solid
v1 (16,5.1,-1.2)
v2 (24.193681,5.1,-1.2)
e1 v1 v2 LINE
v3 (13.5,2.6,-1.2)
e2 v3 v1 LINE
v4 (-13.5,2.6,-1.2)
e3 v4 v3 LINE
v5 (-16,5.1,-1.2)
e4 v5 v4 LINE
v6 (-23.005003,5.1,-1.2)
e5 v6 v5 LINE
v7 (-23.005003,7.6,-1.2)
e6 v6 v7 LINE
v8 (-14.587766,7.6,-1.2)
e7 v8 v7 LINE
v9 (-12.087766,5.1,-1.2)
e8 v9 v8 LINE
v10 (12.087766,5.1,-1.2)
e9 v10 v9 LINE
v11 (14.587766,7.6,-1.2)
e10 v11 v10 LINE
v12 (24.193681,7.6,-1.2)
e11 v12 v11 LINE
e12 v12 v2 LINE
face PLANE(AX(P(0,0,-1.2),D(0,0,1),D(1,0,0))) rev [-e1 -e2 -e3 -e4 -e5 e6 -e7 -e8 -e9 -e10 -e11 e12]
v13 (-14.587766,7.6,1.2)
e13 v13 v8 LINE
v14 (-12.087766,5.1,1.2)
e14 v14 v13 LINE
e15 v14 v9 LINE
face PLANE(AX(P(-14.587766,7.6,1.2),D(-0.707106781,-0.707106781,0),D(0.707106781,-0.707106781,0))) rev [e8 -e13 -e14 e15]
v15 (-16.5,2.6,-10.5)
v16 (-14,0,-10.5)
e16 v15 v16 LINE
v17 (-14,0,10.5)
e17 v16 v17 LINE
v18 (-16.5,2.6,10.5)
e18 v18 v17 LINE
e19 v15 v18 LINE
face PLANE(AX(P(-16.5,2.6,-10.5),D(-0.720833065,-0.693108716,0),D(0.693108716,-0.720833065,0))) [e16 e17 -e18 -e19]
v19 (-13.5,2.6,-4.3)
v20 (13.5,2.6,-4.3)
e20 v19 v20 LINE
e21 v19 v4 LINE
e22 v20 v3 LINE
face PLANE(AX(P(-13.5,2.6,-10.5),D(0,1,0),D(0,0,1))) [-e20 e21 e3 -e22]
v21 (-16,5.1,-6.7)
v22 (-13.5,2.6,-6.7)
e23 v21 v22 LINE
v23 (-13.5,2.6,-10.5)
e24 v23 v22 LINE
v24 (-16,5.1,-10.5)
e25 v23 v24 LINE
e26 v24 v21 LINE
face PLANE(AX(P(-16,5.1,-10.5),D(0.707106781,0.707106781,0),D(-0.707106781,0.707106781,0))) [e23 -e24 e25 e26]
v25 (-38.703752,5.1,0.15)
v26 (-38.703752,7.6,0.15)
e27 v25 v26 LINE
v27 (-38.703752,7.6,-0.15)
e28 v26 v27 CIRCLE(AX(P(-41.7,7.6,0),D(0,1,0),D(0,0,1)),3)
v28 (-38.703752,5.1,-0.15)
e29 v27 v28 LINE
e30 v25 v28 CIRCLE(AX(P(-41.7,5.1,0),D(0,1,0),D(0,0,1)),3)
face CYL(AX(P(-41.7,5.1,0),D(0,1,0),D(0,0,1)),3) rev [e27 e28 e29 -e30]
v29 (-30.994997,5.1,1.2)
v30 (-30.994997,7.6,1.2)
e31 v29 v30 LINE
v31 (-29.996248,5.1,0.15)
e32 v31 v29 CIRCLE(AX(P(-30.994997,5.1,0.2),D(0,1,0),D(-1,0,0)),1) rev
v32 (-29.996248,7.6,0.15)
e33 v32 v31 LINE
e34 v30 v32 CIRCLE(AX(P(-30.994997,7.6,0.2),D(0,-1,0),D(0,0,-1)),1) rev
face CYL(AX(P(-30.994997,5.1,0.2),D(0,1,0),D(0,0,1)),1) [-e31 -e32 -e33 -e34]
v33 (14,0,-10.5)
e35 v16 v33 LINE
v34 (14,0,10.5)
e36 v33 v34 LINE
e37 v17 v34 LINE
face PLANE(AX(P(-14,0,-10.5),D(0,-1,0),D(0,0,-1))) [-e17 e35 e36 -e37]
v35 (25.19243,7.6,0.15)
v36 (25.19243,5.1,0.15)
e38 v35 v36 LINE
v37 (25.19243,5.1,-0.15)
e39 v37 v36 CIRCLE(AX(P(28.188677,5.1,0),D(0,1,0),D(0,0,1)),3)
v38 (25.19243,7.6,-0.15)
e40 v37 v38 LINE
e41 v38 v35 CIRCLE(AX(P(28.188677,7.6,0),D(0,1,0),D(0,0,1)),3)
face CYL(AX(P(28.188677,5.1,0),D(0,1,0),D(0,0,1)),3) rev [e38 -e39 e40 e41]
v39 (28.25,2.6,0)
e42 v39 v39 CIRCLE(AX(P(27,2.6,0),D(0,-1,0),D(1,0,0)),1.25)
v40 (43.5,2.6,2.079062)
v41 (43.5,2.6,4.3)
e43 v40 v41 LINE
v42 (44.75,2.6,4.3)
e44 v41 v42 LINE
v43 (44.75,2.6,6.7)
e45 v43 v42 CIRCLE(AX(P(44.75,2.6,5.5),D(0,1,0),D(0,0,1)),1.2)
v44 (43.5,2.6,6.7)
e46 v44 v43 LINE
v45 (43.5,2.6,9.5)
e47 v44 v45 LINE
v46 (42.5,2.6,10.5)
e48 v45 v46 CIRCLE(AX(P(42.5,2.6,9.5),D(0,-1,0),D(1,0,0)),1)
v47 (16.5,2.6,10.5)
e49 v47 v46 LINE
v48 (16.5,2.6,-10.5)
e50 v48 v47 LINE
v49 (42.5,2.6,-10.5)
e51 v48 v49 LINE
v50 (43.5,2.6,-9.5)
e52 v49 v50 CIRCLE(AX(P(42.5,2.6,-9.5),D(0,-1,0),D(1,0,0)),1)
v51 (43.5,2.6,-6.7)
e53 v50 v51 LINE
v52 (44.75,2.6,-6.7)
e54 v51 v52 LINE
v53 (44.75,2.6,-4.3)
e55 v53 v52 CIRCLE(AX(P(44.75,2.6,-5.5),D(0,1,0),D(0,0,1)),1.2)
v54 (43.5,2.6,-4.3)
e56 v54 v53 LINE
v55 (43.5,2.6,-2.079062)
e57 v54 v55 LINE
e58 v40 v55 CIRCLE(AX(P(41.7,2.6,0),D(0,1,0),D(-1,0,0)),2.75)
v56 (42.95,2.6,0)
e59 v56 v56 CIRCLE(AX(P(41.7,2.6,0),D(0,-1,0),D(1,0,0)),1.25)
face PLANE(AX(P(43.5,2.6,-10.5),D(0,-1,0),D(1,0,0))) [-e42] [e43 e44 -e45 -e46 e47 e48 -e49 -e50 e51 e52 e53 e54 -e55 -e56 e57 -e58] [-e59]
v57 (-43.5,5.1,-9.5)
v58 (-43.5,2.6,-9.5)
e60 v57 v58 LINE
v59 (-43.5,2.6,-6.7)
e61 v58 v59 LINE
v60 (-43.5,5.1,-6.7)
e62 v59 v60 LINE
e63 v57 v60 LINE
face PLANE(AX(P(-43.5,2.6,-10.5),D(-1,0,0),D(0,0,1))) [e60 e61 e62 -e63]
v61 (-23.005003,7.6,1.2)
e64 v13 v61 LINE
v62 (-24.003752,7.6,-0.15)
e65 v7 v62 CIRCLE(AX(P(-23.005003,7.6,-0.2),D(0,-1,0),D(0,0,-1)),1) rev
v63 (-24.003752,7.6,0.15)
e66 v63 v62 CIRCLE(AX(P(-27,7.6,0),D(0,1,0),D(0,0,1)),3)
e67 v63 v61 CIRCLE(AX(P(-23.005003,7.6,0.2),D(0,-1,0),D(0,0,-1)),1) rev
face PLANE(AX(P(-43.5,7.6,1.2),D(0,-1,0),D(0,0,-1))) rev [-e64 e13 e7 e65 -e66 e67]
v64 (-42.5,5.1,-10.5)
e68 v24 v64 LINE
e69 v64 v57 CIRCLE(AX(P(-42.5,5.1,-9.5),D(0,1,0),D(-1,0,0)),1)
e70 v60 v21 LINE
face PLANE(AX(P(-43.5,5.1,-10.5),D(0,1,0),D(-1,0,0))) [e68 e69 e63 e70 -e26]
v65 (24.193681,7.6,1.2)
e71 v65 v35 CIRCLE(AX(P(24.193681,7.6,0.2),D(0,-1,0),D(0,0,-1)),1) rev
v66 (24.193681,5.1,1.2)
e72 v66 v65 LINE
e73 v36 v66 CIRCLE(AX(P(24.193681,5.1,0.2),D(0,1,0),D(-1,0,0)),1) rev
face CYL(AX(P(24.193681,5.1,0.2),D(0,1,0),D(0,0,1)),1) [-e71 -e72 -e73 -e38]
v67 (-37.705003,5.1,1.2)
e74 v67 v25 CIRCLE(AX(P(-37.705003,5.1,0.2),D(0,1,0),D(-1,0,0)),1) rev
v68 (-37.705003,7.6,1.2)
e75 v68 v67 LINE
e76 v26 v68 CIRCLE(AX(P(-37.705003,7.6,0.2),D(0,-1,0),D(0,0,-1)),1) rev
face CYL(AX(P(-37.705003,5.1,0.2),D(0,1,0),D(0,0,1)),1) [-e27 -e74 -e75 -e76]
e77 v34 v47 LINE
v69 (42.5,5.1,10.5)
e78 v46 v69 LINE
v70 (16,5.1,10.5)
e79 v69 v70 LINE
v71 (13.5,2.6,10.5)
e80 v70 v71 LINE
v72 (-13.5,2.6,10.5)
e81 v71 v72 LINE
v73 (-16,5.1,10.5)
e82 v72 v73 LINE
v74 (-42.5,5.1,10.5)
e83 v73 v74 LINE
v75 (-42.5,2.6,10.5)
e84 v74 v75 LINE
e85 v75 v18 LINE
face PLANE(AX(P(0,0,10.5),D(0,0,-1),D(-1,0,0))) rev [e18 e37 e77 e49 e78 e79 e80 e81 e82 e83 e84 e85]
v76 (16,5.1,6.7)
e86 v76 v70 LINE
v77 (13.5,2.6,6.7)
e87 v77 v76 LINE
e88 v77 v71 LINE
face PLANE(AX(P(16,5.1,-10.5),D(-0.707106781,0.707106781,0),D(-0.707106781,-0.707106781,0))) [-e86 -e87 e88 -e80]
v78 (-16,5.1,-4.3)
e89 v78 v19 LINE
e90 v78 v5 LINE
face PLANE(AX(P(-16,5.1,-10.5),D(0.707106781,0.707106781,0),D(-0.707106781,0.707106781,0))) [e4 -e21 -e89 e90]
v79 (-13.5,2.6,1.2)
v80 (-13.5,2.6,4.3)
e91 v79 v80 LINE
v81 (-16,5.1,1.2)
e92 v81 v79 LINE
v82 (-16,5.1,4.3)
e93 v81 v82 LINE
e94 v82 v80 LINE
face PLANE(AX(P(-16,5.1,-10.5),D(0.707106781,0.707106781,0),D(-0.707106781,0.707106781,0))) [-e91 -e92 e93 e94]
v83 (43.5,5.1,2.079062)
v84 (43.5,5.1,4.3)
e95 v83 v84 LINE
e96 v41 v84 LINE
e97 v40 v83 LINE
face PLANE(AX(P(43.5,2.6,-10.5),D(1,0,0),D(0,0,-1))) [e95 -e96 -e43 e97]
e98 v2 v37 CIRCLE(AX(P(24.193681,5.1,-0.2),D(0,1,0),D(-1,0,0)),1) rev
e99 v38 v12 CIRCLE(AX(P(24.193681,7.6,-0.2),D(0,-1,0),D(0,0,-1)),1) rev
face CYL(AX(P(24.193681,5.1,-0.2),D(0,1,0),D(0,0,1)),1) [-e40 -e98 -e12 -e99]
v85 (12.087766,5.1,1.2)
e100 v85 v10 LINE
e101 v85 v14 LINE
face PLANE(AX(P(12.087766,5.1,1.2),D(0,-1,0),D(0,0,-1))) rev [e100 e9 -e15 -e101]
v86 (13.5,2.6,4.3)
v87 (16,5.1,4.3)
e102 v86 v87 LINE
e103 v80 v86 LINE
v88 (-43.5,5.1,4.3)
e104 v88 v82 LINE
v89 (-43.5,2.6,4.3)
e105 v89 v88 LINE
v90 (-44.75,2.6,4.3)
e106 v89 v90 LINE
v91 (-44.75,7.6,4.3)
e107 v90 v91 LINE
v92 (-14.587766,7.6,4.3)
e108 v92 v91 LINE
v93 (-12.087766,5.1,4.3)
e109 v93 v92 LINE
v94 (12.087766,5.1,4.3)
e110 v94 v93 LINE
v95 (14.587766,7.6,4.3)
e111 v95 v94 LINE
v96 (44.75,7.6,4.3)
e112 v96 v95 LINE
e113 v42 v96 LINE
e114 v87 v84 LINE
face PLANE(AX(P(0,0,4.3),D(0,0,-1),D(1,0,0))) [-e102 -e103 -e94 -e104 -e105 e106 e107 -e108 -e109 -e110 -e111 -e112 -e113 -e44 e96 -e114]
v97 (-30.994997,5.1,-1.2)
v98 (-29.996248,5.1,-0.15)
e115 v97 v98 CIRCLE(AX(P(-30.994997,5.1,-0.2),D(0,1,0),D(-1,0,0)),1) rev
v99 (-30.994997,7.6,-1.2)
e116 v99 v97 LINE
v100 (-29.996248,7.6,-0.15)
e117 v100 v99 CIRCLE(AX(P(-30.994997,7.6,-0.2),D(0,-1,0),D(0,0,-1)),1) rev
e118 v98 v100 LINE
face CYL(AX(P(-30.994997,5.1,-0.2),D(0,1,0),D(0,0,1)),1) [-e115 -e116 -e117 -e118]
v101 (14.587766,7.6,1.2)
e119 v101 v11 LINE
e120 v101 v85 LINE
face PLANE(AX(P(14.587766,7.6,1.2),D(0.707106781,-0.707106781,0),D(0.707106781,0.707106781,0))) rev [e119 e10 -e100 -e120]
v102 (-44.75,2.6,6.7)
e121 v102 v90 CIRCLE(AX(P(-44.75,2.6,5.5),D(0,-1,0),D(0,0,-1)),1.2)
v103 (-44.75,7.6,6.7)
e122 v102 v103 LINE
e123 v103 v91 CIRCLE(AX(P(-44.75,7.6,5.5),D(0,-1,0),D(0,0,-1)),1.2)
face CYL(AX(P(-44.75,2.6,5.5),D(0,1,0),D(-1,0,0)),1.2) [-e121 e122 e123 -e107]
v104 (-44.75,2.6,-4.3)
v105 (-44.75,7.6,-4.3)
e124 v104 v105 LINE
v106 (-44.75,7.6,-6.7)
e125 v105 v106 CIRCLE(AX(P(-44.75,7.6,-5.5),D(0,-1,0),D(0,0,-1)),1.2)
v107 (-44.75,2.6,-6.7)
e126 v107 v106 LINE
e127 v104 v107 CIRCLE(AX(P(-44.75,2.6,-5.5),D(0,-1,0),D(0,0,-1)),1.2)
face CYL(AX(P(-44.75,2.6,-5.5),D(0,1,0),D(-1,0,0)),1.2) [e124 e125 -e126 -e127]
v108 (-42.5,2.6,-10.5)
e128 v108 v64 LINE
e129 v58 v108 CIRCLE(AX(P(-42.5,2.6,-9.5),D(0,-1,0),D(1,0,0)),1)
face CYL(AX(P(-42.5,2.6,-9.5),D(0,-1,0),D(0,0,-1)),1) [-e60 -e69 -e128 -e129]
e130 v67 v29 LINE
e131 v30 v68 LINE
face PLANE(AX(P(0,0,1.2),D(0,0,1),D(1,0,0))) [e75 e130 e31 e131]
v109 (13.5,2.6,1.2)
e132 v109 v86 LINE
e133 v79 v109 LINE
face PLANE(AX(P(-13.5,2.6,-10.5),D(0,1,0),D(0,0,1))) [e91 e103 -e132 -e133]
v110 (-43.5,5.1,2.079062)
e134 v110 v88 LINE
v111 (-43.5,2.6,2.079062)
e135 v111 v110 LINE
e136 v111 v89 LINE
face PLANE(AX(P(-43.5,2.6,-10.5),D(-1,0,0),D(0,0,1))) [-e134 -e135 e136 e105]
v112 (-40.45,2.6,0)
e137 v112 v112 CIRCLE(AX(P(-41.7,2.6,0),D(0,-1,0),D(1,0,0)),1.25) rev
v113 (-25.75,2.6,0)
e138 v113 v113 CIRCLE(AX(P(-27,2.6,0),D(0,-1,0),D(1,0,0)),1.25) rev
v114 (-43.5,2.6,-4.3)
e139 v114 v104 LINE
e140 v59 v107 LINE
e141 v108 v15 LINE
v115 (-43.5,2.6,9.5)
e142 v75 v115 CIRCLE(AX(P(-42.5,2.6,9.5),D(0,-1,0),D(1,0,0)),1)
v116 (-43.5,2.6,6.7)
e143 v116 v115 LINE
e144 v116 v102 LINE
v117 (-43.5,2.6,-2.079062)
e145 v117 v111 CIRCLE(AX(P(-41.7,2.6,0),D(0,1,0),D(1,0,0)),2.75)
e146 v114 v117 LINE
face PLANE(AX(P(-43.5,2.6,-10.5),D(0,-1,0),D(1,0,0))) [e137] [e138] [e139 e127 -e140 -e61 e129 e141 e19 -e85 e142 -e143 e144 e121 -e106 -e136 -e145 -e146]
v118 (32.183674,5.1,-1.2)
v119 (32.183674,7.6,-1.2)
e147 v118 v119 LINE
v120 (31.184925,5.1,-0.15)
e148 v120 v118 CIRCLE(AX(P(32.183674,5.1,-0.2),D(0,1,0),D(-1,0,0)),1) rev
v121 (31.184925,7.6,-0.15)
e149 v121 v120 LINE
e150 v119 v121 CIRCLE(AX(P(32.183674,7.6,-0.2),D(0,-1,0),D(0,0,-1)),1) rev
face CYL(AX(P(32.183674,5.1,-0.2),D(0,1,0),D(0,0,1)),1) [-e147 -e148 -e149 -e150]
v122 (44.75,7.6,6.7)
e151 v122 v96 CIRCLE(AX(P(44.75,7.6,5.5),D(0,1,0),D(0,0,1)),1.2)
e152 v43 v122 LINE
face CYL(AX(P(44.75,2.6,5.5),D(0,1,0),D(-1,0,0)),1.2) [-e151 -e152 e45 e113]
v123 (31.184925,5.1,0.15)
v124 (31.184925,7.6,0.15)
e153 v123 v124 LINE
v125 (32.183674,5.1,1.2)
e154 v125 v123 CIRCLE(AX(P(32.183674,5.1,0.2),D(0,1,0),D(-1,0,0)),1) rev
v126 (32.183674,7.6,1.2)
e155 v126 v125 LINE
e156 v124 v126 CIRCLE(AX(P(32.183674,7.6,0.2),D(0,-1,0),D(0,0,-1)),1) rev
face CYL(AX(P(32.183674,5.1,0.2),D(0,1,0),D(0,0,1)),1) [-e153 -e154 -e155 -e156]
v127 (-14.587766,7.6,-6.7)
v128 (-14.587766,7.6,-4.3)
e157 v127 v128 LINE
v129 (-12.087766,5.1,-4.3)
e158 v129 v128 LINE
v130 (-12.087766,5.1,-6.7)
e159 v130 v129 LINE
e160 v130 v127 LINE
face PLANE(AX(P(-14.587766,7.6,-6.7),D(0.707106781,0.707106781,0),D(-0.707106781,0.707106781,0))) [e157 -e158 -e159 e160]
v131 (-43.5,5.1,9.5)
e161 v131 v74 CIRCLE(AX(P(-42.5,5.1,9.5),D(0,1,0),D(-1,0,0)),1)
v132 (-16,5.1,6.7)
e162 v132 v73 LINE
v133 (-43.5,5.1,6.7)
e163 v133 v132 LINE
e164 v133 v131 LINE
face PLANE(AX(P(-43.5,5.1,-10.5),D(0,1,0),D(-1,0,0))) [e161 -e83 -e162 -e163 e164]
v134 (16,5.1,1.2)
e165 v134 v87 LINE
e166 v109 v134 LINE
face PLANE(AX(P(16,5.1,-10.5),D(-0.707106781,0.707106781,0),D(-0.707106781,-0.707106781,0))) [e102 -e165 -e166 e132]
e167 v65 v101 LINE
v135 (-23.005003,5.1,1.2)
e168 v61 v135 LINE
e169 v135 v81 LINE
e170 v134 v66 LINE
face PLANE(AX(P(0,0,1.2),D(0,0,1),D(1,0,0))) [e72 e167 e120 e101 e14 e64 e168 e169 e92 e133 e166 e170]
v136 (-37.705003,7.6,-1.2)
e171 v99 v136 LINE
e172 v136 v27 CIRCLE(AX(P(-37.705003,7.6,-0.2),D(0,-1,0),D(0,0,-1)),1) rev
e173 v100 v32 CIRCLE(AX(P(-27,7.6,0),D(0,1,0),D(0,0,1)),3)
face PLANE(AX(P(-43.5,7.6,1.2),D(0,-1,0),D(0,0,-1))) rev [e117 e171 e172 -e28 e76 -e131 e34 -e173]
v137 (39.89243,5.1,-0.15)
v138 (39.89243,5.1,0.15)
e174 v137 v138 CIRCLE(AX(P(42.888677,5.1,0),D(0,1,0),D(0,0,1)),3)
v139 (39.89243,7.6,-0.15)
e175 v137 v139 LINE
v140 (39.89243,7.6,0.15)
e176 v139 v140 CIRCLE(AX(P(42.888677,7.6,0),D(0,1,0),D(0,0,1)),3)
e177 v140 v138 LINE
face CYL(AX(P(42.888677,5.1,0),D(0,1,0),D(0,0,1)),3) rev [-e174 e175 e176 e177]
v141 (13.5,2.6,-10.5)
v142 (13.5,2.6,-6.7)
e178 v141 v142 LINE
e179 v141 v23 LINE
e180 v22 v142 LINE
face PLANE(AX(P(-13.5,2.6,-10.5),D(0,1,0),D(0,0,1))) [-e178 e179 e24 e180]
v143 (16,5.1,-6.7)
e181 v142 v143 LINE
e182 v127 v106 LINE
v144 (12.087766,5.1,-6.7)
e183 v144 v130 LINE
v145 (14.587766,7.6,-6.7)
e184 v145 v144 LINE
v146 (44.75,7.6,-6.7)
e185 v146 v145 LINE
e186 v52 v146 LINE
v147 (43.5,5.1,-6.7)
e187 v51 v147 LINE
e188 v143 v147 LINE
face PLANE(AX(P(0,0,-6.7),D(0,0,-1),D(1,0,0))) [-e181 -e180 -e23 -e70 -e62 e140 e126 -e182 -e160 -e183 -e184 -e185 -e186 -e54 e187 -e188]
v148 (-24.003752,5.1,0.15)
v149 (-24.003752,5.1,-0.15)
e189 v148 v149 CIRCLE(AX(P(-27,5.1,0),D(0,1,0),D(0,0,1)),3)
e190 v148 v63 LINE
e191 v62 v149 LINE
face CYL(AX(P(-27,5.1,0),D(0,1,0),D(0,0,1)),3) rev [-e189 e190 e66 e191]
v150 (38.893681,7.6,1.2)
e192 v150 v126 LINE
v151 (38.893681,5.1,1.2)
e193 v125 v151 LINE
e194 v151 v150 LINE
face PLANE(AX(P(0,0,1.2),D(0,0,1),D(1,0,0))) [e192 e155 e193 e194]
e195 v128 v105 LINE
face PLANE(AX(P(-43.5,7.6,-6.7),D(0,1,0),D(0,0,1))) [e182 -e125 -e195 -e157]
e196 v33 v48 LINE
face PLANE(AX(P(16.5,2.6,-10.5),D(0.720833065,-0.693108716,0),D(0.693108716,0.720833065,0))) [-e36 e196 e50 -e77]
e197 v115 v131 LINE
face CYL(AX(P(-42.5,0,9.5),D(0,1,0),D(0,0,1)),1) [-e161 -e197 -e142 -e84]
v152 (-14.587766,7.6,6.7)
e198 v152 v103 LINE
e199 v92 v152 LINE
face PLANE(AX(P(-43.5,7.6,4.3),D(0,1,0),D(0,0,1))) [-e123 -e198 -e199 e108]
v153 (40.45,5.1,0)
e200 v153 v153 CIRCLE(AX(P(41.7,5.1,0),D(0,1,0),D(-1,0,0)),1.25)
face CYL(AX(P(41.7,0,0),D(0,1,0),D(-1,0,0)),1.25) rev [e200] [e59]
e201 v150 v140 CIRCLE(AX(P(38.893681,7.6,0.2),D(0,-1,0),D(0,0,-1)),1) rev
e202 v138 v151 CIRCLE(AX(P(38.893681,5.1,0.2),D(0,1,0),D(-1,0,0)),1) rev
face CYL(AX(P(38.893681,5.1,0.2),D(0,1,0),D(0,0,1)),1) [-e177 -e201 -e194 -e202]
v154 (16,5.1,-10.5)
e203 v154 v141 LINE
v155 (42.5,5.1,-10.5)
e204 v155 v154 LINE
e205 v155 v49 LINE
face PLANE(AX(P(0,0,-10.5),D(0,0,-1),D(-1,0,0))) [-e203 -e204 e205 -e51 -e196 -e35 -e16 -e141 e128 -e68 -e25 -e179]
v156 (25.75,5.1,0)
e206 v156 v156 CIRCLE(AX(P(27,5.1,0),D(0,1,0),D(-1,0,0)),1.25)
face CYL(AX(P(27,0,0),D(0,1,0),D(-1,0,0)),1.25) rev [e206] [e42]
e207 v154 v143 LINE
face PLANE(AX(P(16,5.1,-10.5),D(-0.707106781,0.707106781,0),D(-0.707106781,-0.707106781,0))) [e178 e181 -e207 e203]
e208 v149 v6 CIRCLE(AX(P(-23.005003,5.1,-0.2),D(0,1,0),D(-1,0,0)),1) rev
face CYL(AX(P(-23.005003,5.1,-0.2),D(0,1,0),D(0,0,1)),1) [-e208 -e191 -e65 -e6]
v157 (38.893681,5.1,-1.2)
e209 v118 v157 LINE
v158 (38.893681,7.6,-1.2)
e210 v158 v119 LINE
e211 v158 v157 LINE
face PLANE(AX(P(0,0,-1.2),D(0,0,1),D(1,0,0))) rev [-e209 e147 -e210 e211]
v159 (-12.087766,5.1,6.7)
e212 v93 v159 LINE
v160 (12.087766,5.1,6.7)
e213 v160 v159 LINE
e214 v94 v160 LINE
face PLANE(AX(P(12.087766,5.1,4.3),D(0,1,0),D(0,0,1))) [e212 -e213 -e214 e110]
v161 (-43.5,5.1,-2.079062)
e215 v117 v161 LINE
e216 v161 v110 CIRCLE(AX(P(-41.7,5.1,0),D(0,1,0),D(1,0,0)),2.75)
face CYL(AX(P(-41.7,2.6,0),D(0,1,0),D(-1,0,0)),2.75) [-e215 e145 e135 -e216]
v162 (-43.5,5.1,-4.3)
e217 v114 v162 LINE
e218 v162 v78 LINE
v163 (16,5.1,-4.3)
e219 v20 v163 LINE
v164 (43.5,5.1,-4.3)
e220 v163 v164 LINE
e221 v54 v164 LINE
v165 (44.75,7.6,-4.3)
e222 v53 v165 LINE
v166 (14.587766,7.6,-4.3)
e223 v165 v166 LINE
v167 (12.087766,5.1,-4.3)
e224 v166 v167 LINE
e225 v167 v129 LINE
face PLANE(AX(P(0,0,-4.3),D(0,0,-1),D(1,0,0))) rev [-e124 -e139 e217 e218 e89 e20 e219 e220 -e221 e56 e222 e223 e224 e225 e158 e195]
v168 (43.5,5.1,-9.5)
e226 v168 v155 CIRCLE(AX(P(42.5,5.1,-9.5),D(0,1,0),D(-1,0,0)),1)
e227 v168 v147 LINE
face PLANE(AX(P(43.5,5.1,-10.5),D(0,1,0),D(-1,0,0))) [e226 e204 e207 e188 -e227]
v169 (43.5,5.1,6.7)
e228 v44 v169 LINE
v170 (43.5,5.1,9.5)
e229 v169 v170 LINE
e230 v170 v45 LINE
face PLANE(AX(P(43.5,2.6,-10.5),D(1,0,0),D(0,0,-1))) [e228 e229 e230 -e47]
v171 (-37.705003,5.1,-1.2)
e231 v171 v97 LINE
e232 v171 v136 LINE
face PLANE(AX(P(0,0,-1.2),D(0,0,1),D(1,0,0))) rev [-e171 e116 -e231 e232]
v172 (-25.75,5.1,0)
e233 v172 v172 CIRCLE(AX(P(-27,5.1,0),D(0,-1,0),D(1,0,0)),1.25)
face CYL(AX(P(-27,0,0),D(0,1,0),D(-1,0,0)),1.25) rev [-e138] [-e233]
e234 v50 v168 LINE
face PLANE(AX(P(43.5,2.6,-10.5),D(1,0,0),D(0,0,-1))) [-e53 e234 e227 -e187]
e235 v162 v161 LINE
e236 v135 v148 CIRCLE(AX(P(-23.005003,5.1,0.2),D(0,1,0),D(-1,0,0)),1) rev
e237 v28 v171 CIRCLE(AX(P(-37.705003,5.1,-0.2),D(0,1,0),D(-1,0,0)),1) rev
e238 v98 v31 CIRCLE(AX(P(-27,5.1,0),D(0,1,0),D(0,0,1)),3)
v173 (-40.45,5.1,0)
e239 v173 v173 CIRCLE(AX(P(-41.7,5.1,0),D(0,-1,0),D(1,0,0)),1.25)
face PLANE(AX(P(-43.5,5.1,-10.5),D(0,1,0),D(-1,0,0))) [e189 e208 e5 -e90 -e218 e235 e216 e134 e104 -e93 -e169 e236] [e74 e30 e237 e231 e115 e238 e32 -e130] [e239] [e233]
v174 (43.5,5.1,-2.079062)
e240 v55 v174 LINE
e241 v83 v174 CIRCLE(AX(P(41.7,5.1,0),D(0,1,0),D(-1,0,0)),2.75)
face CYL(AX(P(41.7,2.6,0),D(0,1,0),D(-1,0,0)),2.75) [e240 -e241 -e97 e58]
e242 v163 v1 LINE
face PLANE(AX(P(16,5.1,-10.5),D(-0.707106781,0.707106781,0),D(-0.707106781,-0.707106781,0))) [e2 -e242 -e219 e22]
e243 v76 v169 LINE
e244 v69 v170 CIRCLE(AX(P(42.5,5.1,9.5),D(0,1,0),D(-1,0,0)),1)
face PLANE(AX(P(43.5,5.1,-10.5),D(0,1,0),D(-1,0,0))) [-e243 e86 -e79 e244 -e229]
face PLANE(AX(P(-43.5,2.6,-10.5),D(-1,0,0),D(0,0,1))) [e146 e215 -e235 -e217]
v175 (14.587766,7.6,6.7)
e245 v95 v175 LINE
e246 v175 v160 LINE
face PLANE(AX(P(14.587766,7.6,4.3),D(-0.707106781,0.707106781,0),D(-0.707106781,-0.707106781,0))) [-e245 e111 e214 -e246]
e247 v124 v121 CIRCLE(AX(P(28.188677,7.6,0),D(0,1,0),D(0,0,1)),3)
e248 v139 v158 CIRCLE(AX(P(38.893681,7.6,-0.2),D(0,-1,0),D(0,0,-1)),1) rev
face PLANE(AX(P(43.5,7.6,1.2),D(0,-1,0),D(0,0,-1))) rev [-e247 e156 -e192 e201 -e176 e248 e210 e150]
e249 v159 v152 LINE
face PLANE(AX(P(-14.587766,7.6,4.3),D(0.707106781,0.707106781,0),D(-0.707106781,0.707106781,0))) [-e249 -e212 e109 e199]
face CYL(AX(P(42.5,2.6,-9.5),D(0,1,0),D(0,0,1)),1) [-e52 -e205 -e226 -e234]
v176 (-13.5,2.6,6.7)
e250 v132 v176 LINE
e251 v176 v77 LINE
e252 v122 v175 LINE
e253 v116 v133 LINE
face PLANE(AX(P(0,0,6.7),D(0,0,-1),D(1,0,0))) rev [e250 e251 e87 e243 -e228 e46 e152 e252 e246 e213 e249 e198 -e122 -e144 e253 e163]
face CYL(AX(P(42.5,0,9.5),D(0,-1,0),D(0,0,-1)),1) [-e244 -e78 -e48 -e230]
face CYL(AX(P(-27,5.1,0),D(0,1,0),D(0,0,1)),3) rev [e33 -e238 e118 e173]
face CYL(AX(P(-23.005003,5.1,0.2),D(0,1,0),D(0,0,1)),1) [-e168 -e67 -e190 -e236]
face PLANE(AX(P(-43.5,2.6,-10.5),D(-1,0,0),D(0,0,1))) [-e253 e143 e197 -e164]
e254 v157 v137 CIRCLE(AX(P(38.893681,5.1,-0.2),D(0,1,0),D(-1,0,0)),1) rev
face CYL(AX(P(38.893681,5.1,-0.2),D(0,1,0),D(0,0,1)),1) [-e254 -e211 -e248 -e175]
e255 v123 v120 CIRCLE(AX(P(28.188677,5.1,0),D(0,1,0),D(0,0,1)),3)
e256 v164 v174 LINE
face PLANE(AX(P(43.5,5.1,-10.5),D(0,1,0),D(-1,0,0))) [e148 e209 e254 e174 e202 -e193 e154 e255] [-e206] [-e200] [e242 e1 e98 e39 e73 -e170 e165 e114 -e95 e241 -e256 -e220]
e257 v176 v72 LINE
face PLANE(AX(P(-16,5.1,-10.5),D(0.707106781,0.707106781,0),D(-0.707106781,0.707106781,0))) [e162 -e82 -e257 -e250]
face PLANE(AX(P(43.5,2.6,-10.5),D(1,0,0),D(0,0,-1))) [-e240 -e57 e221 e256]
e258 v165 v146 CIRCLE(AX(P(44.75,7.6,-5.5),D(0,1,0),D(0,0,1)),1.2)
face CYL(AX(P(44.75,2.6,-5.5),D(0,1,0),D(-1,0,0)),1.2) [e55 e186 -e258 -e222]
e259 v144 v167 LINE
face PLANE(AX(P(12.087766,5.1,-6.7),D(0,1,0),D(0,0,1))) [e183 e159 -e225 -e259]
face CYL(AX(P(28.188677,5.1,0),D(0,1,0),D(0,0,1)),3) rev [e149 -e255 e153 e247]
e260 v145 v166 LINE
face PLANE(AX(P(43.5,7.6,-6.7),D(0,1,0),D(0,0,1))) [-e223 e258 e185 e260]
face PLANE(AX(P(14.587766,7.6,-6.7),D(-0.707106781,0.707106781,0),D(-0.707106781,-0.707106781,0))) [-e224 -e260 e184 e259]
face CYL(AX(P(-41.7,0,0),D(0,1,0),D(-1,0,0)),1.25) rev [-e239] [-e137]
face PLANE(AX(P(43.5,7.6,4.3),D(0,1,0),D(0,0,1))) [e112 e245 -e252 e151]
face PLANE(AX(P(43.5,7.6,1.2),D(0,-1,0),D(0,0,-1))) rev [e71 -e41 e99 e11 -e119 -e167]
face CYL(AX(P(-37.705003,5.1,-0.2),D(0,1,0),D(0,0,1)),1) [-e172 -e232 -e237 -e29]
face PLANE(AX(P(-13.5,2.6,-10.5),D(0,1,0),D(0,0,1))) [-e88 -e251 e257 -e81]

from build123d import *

# Parameters (mm, degrees)
BOSS_EXTRUDE1_DEPTH  = 10.5
SKETCH2_R            = 1.25
CUT_EXTRUDE1_DEPTH   = 46.038983115
BOSS_EXTRUDE19_DEPTH = 1.2
LPATTERN1_START      = -6.7
LPATTERN1_DEPTH      = 2.4
LPATTERN1_START_2    = 4.3
LPATTERN1_2_DEPTH    = 2.4
SKETCH5_R            = 3
CUT_EXTRUDE2_DEPTH   = 2.5
FILLET1_R            = 1
BOSS_EXTRUDE20_DEPTH = 5
FILLET2_R            = 1
BOSS_EXTRUDE21_DEPTH = 2.5


# Read off the part's stored shape, not the designer's step: LPattern1
with BuildPart() as part:
    # Sketch1 → Boss-Extrude1 (new, symmetric)
    with BuildSketch(Plane.XY):
        Polygon((-43.5, 2.6), (-16.5, 2.6), (-14, 0), (14, 0), (16.5, 2.6), (43.5, 2.6), (43.5, 5.1), (16, 5.1), (13.5, 2.6), (-13.5, 2.6), (-16, 5.1), (-43.5, 5.1), align=None)
    extrude(amount=BOSS_EXTRUDE1_DEPTH, both=True)

    # Sketch2 → Cut-Extrude1 (cut, through all)
    with BuildSketch(Plane(origin=(0, 5.1, 0), x_dir=(1, 0, 0), z_dir=(0, 1, 0))):
        with Locations(Location((27, 0, 0), (0, 0, 180))):
            Circle(SKETCH2_R)
        with Locations(Location((41.7, 0, 0), (0, 0, 180))):
            Circle(SKETCH2_R)
    cut_extrude1 = extrude(amount=-CUT_EXTRUDE1_DEPTH, mode=Mode.SUBTRACT)

    # Mirror1: Cut-Extrude1 across plane
    add(cut_extrude1.mirror(Plane(origin=(0, 0, 0), x_dir=(0, 0, 1), z_dir=(1, 0, 0))), mode=Mode.SUBTRACT)

    # Sketch4 → Boss-Extrude19 (add, symmetric)
    with BuildSketch(Plane.XY):
        Polygon((-43.5, 7.6), (-14.587766262, 7.6), (-12.087766262, 5.1), (12.087766262, 5.1), (14.587766262, 7.6), (43.5, 7.6), (43.5, 5.1), (16, 5.1), (13.5, 2.6), (-13.5, 2.6), (-16, 5.1), (-43.5, 5.1), align=None)
    boss_extrude19 = extrude(amount=BOSS_EXTRUDE19_DEPTH, both=True)

    # Mirror2: Boss-Extrude19 across plane
    add(boss_extrude19.mirror(Plane.XY))

    # LPattern1 outline → LPattern1 (add)
    with BuildSketch(Plane.XY.offset(LPATTERN1_START)):
        Polygon((14.587766262, 7.6), (12.087766262, 5.1), (-12.087766262, 5.1), (-14.587766262, 7.6), (-43.5, 7.6), (-43.5, 5.1), (-16, 5.1), (-13.5, 2.6), (13.5, 2.6), (16, 5.1), (43.5, 5.1), (43.5, 7.6), align=None)
    extrude(amount=LPATTERN1_DEPTH)

    # LPattern1 2 outline → LPattern1 2 (add)
    with BuildSketch(Plane.XY.offset(LPATTERN1_START_2)):
        Polygon((14.587766262, 7.6), (12.087766262, 5.1), (-12.087766262, 5.1), (-14.587766262, 7.6), (-43.5, 7.6), (-43.5, 5.1), (-16, 5.1), (-13.5, 2.6), (13.5, 2.6), (16, 5.1), (43.5, 5.1), (43.5, 7.6), align=None)
    extrude(amount=LPATTERN1_2_DEPTH)

    # Sketch5 → Cut-Extrude2 (cut)
    with BuildSketch(Plane(origin=(0, 7.6, 0), x_dir=(1, 0, 0), z_dir=(0, 1, 0))):
        with Locations((-41.7, 0)):
            Circle(SKETCH5_R)
        with Locations((-27, 0)):
            Circle(SKETCH5_R)
        with Locations((42.888677457, 0)):
            Circle(SKETCH5_R)
        with Locations((28.188677457, 0)):
            Circle(SKETCH5_R)
    extrude(amount=-CUT_EXTRUDE2_DEPTH, mode=Mode.SUBTRACT)

    # Fillet1
    fillet1_edges = [part.edges().sort_by_distance(p)[0] for p in [
        (-29.749545417, 6.35, -1.2),
        (-24.250454583, 6.35, -1.2),
        (40.13913204, 6.35, -1.2),
        (25.43913204, 6.35, -1.2),
        (30.938222874, 6.35, -1.2),
        (-38.950454583, 6.35, -1.2),
        (-38.950454583, 6.35, 1.2),
        (30.938222874, 6.35, 1.2),
        (25.43913204, 6.35, 1.2),
        (40.13913204, 6.35, 1.2),
        (-24.250454583, 6.35, 1.2),
        (-29.749545417, 6.35, 1.2),
    ]]
    fillet(fillet1_edges, radius=FILLET1_R)

    # Sketch6 → Boss-Extrude20 (add)
    with BuildSketch(Plane(origin=(0, 7.6, 0), x_dir=(1, 0, 0), z_dir=(0, 1, 0))):
        with BuildLine():
            Line((43.5, -4.3), (43.5, -6.7))
            Line((43.5, -6.7), (44.75, -6.7))
            ThreePointArc((44.75, -6.7), (45.95, -5.5), (44.75, -4.3))
            Line((44.75, -4.3), (43.5, -4.3))
        make_face()
        with BuildLine():
            Line((43.5, 6.7), (43.5, 4.3))
            Line((43.5, 4.3), (44.75, 4.3))
            ThreePointArc((44.75, 4.3), (45.95, 5.5), (44.75, 6.7))
            Line((44.75, 6.7), (43.5, 6.7))
        make_face()
        with BuildLine():
            Line((-43.5, 6.7), (-44.75, 6.7))
            ThreePointArc((-44.75, 6.7), (-45.95, 5.5), (-44.75, 4.3))
            Line((-44.75, 4.3), (-43.5, 4.3))
            Line((-43.5, 4.3), (-43.5, 6.7))
        make_face()
        with BuildLine():
            Line((-43.5, -4.3), (-44.75, -4.3))
            ThreePointArc((-44.75, -4.3), (-45.95, -5.5), (-44.75, -6.7))
            Line((-44.75, -6.7), (-43.5, -6.7))
            Line((-43.5, -6.7), (-43.5, -4.3))
        make_face()
    extrude(amount=-BOSS_EXTRUDE20_DEPTH)

    # Fillet2
    fillet2_edges = [part.edges().sort_by_distance(p)[0] for p in [
        (43.5, 3.85, 10.5),
        (-43.5, 3.85, 10.5),
        (43.5, 3.85, -10.5),
        (-43.5, 3.85, -10.5),
    ]]
    fillet(fillet2_edges, radius=FILLET2_R)

    # Sketch7 → Boss-Extrude21 (add)
    with BuildSketch(Plane(origin=(0, 5.1, 0), x_dir=(1, 0, 0), z_dir=(0, 1, 0))):
        with BuildLine():
            Line((43.5, -2.079062289), (43.5, 2.079062289))
            ThreePointArc((43.5, 2.079062289), (44.45, 0), (43.5, -2.079062289))
        make_face()
        with BuildLine():
            Line((-43.5, -2.079062289), (-43.5, 2.079062289))
            ThreePointArc((-43.5, 2.079062289), (-44.45, 0), (-43.5, -2.079062289))
        make_face()
    extrude(amount=-BOSS_EXTRUDE21_DEPTH)


solid = part.part
